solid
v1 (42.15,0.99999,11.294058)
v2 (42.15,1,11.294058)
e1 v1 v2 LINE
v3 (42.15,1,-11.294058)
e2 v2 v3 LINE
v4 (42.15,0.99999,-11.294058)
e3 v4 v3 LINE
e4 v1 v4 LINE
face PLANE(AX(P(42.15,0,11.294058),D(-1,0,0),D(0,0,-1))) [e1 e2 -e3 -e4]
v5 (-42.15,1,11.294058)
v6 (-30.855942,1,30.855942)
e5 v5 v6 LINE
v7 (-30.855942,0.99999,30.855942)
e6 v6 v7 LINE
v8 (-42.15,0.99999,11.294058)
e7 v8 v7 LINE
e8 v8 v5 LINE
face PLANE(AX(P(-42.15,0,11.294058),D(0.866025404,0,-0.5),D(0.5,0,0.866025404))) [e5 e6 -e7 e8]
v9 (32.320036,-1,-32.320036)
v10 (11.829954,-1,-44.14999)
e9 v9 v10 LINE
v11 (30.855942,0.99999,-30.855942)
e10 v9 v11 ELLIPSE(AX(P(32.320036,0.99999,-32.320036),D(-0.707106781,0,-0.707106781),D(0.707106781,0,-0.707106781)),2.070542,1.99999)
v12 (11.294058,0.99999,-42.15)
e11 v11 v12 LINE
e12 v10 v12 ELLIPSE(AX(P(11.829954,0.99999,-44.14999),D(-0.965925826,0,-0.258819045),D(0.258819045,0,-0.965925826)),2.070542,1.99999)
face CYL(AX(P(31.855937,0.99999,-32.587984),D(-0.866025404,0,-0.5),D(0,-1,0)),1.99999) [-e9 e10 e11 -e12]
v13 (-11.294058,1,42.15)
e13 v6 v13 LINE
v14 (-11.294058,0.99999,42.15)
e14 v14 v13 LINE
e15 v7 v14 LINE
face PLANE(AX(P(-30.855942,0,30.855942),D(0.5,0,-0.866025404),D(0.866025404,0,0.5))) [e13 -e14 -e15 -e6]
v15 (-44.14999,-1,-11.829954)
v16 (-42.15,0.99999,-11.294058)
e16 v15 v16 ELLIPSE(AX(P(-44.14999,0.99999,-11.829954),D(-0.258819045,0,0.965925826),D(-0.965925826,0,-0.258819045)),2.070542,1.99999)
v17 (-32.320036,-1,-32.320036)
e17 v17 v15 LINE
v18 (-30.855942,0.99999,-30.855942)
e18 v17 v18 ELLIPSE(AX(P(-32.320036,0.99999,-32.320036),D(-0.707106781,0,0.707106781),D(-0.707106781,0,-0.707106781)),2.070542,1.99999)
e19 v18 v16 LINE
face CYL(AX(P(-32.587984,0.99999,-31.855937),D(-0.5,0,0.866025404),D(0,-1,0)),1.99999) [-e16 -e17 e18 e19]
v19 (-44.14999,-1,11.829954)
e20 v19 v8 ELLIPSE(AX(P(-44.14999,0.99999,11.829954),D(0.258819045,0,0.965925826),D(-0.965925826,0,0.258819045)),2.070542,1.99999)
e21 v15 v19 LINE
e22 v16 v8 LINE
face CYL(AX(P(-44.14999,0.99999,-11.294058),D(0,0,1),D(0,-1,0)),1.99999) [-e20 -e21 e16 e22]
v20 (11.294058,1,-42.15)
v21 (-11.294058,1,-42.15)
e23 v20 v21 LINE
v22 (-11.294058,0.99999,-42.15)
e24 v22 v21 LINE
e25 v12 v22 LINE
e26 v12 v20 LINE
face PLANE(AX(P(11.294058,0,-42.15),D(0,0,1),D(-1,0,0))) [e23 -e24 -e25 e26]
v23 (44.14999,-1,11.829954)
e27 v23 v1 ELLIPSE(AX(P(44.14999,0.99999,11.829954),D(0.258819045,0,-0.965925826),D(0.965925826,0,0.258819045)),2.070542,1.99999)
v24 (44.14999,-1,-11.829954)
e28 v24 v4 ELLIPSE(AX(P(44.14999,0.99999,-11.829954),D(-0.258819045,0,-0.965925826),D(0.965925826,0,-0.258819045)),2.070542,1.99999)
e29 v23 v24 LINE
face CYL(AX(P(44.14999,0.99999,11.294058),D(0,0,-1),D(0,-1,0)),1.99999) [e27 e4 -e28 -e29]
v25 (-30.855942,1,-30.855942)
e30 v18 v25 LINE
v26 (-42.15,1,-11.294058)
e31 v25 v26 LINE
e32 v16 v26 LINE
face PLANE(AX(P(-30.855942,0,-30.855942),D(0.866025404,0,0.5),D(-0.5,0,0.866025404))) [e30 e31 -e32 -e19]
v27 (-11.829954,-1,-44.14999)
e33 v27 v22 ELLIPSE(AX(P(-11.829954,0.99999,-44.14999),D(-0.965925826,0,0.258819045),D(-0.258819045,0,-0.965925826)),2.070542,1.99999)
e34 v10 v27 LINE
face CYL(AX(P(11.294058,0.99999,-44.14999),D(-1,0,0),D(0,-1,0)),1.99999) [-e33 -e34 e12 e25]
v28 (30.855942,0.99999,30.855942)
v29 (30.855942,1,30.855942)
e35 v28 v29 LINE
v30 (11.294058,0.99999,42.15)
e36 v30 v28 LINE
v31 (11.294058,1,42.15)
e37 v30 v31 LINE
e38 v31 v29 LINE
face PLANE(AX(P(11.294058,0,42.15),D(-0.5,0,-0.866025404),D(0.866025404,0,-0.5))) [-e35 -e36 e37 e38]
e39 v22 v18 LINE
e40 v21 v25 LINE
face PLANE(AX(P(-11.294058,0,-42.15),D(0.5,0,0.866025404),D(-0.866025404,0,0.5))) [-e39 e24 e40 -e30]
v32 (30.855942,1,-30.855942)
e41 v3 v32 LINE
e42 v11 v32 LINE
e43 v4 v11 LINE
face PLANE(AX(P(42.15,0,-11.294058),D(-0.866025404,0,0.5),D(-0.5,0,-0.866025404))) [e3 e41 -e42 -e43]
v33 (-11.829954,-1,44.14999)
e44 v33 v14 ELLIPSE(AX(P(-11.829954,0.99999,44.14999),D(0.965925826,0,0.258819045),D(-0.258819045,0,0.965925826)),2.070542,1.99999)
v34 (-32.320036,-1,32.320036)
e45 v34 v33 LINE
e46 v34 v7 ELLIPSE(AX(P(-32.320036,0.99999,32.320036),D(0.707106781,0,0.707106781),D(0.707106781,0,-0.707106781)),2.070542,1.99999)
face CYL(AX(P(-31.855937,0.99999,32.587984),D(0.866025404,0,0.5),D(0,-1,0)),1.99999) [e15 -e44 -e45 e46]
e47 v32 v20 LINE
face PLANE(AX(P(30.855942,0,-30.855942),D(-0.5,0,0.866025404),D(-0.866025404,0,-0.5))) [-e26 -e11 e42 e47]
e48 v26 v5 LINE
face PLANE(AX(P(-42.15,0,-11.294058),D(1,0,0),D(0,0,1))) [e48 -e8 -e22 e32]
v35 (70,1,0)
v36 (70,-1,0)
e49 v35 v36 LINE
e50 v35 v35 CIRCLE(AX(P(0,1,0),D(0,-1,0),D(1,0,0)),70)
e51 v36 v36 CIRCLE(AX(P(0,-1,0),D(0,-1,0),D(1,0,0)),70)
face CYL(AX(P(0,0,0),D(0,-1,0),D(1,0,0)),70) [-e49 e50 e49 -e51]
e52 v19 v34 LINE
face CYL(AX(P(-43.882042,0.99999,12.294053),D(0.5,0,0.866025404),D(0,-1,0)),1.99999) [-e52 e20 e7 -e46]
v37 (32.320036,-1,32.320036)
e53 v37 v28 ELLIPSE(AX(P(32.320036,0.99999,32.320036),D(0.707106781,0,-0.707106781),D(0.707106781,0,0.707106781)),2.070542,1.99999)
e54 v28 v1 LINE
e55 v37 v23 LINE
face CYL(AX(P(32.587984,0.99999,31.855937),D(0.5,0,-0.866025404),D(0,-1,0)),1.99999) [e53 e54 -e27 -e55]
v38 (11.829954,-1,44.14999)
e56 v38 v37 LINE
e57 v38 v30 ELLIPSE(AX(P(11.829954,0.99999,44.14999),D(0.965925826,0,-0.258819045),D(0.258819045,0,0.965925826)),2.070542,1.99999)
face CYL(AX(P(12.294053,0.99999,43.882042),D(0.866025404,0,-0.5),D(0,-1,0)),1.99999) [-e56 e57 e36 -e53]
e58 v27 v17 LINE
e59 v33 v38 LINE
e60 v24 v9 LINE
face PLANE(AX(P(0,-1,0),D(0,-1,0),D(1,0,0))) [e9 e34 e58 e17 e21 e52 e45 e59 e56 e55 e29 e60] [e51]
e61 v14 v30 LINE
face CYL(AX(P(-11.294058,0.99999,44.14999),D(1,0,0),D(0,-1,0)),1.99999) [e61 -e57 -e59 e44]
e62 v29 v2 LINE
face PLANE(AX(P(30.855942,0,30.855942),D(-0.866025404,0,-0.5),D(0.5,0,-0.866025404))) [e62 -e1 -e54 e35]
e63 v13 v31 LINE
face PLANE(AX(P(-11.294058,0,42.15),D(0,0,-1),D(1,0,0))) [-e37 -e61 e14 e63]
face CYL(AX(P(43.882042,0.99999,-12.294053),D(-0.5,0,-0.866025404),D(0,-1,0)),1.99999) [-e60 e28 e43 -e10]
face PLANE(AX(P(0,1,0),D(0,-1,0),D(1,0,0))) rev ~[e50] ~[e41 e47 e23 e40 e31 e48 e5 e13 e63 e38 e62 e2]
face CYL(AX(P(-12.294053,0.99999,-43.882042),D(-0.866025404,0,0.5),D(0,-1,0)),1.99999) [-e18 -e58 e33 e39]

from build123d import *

# Parameters (mm, degrees)
F0_R     = 70
F1_DEPTH = 1
F3_R     = 1.99999


# Not quite as in the source:
# - a fillet or chamfer is up to 0.001 mm smaller than in the source, because OpenCascade refuses the exact size
# - a feature of the source that left no trace in its solid (it failed there, or was rolled back) is left out


with BuildPart() as f1:
    # F0 (on Front) → F1 (new body, symmetric)
    with BuildSketch(Plane.XZ):
        Circle(F0_R)
        Polygon((-30.855941539, 30.855941539), (-11.294058461, 42.15), (11.294058461, 42.15), (30.855941539, 30.855941539), (42.15, 11.294058461), (42.15, -11.294058461), (30.855941539, -30.855941539), (11.294058461, -42.15), (-11.294058461, -42.15), (-30.855941539, -30.855941539), (-42.15, -11.294058461), (-42.15, 11.294058461), align=None, mode=Mode.SUBTRACT)
    extrude(amount=F1_DEPTH, both=True)

    # F3 (radius 2 in the source; OpenCascade refuses exactly that, so slightly less here)
    f3_edges = [f1.edges().sort_by_distance(p)[0] for p in [
        (-21.075, -1, 36.502971),
        (0, -1, 42.15),
        (21.075, -1, 36.502971),
        (36.502971, -1, 21.075),
        (42.15, -1, 0),
        (36.502971, -1, -21.075),
        (21.075, -1, -36.502971),
        (0, -1, -42.15),
        (-21.075, -1, -36.502971),
        (-36.502971, -1, -21.075),
        (-42.15, -1, 0),
        (-36.502971, -1, 21.075),
    ]]
    fillet(f3_edges, radius=F3_R)


solid = f1.part
